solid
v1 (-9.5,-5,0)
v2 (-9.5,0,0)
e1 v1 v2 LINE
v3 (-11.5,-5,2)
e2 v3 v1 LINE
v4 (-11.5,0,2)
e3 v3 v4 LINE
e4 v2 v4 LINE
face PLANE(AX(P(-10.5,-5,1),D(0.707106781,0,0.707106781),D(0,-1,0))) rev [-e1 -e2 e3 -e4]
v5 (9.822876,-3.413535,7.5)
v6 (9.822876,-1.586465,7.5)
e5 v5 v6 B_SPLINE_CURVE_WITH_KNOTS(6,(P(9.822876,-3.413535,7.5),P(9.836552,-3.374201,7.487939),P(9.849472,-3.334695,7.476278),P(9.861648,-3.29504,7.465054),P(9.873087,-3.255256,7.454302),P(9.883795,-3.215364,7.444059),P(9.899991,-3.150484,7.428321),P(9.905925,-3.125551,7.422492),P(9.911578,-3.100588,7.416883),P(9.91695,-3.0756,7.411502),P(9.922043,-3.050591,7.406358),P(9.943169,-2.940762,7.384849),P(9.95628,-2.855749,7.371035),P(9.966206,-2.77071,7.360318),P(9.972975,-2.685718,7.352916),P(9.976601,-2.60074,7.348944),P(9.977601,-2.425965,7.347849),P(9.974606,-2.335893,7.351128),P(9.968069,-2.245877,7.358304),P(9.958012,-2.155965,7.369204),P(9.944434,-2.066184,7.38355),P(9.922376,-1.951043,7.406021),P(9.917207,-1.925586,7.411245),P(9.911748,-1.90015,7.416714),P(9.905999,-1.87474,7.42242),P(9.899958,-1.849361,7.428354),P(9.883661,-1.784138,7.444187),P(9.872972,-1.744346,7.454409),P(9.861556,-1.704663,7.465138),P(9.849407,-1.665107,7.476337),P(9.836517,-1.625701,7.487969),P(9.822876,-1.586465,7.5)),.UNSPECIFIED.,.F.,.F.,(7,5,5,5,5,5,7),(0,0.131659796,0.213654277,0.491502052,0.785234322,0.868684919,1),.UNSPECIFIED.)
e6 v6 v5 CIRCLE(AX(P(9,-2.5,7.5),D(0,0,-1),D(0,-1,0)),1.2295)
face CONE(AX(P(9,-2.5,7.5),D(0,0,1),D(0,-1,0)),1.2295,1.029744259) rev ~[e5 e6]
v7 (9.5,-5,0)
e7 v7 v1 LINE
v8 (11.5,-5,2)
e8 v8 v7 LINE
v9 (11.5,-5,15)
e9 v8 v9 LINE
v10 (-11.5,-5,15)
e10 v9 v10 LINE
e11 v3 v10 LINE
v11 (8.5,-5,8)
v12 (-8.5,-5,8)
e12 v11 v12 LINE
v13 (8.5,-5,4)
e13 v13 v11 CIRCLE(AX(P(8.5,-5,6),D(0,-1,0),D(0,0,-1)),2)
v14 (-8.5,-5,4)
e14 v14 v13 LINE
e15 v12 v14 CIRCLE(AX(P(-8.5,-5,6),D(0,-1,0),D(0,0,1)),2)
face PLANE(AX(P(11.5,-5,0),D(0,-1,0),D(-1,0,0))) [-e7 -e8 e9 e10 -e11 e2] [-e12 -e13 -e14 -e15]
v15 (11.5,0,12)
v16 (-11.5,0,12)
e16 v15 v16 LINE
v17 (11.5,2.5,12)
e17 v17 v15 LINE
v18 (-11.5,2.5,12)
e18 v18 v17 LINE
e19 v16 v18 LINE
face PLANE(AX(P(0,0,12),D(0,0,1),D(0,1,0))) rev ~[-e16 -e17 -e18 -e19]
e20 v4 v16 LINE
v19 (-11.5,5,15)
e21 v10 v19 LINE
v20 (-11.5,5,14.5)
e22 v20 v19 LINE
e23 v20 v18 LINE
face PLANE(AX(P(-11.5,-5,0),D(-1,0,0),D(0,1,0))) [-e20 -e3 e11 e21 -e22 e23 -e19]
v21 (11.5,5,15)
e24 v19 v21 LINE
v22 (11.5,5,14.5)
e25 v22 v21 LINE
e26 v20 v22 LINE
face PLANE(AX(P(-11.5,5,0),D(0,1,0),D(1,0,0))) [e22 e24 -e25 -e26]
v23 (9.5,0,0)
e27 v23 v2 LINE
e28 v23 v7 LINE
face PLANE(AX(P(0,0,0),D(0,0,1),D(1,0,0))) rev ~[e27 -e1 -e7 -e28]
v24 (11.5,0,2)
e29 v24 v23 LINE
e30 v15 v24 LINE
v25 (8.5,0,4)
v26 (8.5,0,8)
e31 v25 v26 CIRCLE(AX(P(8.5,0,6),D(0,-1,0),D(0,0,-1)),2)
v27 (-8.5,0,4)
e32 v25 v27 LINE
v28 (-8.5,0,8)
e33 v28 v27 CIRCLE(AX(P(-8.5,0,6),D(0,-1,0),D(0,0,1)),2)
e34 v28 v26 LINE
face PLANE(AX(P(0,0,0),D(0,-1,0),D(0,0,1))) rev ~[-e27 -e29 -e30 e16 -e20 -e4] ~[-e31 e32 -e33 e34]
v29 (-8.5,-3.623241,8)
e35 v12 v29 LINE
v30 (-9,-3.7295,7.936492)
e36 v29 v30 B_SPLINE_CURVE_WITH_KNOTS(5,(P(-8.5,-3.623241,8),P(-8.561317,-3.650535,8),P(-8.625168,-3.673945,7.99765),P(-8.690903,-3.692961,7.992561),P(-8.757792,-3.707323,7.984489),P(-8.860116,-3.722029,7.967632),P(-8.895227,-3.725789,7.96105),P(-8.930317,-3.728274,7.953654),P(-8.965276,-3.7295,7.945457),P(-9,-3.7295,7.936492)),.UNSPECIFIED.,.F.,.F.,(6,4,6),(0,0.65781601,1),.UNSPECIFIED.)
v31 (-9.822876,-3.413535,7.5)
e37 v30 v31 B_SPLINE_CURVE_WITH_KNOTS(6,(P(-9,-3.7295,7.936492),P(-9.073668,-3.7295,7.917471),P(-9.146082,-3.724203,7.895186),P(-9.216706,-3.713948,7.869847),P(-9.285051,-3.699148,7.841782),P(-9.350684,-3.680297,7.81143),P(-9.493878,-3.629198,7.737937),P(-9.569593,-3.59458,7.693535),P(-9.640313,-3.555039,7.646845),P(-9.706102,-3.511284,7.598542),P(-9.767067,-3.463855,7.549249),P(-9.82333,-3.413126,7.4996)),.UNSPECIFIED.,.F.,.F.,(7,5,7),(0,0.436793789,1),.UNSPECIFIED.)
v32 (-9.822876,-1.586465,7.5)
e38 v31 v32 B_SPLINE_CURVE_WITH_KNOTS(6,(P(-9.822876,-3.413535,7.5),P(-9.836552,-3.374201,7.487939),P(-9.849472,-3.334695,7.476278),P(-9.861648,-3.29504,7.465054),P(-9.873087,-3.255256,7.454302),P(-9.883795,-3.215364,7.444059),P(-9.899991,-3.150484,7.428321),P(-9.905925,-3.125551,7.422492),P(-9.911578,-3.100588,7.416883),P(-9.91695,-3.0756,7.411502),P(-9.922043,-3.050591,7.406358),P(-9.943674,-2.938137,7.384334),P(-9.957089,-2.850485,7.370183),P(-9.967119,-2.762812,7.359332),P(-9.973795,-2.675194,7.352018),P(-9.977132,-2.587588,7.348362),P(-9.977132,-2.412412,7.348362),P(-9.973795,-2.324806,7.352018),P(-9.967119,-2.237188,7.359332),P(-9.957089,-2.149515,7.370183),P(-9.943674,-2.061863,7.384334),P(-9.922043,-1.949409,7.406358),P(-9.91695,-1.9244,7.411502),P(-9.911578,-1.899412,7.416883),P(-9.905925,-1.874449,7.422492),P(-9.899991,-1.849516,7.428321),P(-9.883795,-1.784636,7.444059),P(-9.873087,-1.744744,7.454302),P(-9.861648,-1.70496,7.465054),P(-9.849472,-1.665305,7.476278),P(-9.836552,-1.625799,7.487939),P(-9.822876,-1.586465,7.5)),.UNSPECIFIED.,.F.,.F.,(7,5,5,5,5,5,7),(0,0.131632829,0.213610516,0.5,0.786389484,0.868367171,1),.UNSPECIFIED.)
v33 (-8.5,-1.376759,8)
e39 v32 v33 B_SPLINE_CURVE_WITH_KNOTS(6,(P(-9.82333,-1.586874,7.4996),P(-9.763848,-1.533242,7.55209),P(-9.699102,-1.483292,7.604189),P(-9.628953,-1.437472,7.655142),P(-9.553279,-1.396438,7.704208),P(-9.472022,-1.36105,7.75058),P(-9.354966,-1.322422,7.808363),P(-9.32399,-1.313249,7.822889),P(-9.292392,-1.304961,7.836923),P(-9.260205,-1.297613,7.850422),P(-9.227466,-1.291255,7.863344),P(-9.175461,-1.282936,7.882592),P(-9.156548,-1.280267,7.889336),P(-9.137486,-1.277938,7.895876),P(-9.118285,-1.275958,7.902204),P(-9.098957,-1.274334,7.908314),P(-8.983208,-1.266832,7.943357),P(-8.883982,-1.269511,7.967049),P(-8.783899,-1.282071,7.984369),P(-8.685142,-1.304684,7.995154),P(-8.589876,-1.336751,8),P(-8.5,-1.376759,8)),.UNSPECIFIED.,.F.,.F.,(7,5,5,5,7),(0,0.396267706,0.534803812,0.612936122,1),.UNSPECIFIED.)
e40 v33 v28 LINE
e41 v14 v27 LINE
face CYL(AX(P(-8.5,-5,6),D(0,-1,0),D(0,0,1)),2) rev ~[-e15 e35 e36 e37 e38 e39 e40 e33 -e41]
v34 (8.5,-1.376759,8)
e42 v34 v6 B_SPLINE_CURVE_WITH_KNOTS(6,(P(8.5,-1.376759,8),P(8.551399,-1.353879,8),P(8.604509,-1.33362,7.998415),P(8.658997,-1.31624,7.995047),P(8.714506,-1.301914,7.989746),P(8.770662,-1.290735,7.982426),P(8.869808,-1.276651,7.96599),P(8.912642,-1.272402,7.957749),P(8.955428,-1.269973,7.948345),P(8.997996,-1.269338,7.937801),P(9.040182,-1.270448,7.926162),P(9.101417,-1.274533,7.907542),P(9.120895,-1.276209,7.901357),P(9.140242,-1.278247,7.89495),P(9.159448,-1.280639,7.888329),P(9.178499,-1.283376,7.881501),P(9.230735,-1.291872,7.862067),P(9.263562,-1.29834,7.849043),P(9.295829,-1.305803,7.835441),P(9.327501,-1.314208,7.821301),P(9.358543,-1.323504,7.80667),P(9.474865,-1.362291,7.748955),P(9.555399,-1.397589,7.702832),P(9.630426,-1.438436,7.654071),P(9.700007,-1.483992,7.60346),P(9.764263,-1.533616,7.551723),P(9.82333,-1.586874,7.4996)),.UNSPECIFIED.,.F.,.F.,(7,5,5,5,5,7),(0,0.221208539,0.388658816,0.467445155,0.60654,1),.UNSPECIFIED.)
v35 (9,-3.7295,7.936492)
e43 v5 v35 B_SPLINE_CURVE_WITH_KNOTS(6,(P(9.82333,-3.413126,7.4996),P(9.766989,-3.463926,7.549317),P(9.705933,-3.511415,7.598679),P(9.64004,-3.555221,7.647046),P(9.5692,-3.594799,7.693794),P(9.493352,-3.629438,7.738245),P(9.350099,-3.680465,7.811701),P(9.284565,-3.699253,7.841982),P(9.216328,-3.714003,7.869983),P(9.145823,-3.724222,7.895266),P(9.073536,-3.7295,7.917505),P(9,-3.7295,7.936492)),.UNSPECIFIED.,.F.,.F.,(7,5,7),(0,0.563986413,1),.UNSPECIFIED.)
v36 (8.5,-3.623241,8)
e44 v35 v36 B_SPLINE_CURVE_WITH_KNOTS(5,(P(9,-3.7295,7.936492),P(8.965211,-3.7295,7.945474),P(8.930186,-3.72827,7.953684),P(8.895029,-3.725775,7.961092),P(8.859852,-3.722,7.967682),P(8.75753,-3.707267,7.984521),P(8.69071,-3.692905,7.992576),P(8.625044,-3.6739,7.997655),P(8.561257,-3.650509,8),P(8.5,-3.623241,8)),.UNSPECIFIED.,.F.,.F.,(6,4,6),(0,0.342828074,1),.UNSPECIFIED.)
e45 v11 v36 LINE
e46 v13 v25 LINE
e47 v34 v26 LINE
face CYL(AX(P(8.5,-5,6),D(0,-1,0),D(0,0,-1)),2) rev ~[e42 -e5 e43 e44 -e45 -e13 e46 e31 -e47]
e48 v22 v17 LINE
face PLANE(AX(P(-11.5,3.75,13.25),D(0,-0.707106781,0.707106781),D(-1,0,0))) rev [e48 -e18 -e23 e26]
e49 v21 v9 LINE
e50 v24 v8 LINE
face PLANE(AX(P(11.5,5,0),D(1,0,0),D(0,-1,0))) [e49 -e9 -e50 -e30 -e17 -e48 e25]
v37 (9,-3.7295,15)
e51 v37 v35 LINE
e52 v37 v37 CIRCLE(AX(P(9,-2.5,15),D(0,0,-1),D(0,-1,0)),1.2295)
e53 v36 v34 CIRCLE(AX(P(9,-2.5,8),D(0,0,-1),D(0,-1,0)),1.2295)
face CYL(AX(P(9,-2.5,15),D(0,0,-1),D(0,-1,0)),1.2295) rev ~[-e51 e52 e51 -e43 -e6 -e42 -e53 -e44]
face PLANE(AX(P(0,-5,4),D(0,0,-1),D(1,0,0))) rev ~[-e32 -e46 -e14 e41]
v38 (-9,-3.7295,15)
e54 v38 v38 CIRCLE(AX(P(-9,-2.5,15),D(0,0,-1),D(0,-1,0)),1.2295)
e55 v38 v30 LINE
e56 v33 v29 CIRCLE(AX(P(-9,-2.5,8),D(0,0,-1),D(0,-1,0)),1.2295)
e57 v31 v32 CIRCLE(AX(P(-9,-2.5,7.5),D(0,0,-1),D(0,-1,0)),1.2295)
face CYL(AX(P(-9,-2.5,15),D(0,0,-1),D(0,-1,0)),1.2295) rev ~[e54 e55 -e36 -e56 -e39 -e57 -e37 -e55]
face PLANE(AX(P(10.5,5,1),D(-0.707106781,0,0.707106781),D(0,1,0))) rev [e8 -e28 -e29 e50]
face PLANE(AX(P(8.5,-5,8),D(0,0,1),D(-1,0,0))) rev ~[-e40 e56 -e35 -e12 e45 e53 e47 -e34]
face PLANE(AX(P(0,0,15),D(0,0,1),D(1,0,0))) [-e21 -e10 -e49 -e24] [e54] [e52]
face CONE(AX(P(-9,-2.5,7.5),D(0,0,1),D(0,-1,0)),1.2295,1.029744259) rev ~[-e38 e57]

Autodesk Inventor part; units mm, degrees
ref_plane "YZ Plane" through (0, 0, 0) normal (1, 0, 0) x (0, 1, 0)
ref_plane "XZ Plane" through (0, 0, 0) normal (0, 1, 0) x (-1, 0, 0)
ref_plane "XY Plane" through (0, 0, 0) normal (0, 0, 1) x (1, 0, 0)
sketch "Esboço1" plane through (0, 0, 0) normal (0, 0, 1) x (1, 0, 0)
  line L0 (-11.5, 5) -> (11.5, 5)
  line L1 (11.5, 5) -> (11.5, -5)
  line L2 (11.5, -5) -> (-11.5, -5)
  line L3 (-11.5, -5) -> (-11.5, 5)
  line L4 (-11.5, 5) -> (11.5, -5) construction
  line L5 (11.5, 5) -> (-11.5, -5) construction
  point P0 (0, 0)
  dimension "d0" = 10
  dimension "d1" = 23
extrude "Extrusão1" add sketch "Esboço1" along normal blind 15
chamfer "Chanfro1" distance 2 angle 45 2 edges at (-11.5, 0, 0) (11.5, 0, 0)
sketch "Esboço4" plane through (-11.5, -5, 15) normal (0, -1, 0) x (1, 0, 0)
  line L0 (11.5, -15) -> (11.5, -9)
  line L1 (3, -9) -> (20, -9) construction
  line L2 (3, -11) -> (20, -11)
  line L3 (20, -7) -> (3, -7)
  arc A0 (3, -7) -> (3, -11) centre (3, -9) ccw
  arc A1 (20, -11) -> (20, -7) centre (20, -9) ccw
  line L4 (23, -13) -> (23, 0) projected
  dimension "d18" = 6
  dimension "d19" = 4
  dimension "d20" = 3
extrude "Extrusão3" cut sketch "Esboço4" against normal through all
sketch "Esboço2" plane through (0, 0, 15) normal (0, 0, 1) x (1, 0, 0)
  line L0 (11.5, 5) -> (-11.5, 5) projected
  line L1 (-11.5, -5) -> (11.5, -5) projected
  line L2 (-9, -2.5) -> (9, -2.5)
  line L3 (0, 0) -> (0, -2.5)
  line L4 (-11.5, 5) -> (-11.5, -5) projected
  dimension "d32" = 2.5
  dimension "d36" = 2.5
hole "Furo1" at (-9, -2.5, 15) at (9, -2.5, 15) direction (0, 0, -1) diameter 2.459 depth 7.5 tip angle 118 thread size "M3x0.5" class "6H" standard "ISO Metric profile"
sketch "Esboço5" plane through (0, 0, 0) normal (1, 0, 0) x (0, 1, 0)
  line L0 (5, 0) -> (-5, 0) projected
  line L1 (5, 0) -> (0, 0)
  line L2 (0, 0) -> (0, 12)
  line L3 (0, 12) -> (5, 12)
  line L4 (5, 12) -> (5, 0)
  line L5 (-5, 0) -> (-5, 2) projected
  line L6 (5, 15) -> (-5, 15) projected
  point P0 (0, 0)
  point P1 (2.5, 0)
  dimension "d27" = 5
  dimension "d29" = 3
extrude "Extrusão4" cut sketch "Esboço5" along normal through all both and the other way through all
chamfer "Chanfro2" distance 2.5 angle 45 1 edges at (0, 5, 12)
properties part number "SUPORTE ADAPTADOR USB TIPO C REV03 - PARTE 02" material "Alumínio 6061"
